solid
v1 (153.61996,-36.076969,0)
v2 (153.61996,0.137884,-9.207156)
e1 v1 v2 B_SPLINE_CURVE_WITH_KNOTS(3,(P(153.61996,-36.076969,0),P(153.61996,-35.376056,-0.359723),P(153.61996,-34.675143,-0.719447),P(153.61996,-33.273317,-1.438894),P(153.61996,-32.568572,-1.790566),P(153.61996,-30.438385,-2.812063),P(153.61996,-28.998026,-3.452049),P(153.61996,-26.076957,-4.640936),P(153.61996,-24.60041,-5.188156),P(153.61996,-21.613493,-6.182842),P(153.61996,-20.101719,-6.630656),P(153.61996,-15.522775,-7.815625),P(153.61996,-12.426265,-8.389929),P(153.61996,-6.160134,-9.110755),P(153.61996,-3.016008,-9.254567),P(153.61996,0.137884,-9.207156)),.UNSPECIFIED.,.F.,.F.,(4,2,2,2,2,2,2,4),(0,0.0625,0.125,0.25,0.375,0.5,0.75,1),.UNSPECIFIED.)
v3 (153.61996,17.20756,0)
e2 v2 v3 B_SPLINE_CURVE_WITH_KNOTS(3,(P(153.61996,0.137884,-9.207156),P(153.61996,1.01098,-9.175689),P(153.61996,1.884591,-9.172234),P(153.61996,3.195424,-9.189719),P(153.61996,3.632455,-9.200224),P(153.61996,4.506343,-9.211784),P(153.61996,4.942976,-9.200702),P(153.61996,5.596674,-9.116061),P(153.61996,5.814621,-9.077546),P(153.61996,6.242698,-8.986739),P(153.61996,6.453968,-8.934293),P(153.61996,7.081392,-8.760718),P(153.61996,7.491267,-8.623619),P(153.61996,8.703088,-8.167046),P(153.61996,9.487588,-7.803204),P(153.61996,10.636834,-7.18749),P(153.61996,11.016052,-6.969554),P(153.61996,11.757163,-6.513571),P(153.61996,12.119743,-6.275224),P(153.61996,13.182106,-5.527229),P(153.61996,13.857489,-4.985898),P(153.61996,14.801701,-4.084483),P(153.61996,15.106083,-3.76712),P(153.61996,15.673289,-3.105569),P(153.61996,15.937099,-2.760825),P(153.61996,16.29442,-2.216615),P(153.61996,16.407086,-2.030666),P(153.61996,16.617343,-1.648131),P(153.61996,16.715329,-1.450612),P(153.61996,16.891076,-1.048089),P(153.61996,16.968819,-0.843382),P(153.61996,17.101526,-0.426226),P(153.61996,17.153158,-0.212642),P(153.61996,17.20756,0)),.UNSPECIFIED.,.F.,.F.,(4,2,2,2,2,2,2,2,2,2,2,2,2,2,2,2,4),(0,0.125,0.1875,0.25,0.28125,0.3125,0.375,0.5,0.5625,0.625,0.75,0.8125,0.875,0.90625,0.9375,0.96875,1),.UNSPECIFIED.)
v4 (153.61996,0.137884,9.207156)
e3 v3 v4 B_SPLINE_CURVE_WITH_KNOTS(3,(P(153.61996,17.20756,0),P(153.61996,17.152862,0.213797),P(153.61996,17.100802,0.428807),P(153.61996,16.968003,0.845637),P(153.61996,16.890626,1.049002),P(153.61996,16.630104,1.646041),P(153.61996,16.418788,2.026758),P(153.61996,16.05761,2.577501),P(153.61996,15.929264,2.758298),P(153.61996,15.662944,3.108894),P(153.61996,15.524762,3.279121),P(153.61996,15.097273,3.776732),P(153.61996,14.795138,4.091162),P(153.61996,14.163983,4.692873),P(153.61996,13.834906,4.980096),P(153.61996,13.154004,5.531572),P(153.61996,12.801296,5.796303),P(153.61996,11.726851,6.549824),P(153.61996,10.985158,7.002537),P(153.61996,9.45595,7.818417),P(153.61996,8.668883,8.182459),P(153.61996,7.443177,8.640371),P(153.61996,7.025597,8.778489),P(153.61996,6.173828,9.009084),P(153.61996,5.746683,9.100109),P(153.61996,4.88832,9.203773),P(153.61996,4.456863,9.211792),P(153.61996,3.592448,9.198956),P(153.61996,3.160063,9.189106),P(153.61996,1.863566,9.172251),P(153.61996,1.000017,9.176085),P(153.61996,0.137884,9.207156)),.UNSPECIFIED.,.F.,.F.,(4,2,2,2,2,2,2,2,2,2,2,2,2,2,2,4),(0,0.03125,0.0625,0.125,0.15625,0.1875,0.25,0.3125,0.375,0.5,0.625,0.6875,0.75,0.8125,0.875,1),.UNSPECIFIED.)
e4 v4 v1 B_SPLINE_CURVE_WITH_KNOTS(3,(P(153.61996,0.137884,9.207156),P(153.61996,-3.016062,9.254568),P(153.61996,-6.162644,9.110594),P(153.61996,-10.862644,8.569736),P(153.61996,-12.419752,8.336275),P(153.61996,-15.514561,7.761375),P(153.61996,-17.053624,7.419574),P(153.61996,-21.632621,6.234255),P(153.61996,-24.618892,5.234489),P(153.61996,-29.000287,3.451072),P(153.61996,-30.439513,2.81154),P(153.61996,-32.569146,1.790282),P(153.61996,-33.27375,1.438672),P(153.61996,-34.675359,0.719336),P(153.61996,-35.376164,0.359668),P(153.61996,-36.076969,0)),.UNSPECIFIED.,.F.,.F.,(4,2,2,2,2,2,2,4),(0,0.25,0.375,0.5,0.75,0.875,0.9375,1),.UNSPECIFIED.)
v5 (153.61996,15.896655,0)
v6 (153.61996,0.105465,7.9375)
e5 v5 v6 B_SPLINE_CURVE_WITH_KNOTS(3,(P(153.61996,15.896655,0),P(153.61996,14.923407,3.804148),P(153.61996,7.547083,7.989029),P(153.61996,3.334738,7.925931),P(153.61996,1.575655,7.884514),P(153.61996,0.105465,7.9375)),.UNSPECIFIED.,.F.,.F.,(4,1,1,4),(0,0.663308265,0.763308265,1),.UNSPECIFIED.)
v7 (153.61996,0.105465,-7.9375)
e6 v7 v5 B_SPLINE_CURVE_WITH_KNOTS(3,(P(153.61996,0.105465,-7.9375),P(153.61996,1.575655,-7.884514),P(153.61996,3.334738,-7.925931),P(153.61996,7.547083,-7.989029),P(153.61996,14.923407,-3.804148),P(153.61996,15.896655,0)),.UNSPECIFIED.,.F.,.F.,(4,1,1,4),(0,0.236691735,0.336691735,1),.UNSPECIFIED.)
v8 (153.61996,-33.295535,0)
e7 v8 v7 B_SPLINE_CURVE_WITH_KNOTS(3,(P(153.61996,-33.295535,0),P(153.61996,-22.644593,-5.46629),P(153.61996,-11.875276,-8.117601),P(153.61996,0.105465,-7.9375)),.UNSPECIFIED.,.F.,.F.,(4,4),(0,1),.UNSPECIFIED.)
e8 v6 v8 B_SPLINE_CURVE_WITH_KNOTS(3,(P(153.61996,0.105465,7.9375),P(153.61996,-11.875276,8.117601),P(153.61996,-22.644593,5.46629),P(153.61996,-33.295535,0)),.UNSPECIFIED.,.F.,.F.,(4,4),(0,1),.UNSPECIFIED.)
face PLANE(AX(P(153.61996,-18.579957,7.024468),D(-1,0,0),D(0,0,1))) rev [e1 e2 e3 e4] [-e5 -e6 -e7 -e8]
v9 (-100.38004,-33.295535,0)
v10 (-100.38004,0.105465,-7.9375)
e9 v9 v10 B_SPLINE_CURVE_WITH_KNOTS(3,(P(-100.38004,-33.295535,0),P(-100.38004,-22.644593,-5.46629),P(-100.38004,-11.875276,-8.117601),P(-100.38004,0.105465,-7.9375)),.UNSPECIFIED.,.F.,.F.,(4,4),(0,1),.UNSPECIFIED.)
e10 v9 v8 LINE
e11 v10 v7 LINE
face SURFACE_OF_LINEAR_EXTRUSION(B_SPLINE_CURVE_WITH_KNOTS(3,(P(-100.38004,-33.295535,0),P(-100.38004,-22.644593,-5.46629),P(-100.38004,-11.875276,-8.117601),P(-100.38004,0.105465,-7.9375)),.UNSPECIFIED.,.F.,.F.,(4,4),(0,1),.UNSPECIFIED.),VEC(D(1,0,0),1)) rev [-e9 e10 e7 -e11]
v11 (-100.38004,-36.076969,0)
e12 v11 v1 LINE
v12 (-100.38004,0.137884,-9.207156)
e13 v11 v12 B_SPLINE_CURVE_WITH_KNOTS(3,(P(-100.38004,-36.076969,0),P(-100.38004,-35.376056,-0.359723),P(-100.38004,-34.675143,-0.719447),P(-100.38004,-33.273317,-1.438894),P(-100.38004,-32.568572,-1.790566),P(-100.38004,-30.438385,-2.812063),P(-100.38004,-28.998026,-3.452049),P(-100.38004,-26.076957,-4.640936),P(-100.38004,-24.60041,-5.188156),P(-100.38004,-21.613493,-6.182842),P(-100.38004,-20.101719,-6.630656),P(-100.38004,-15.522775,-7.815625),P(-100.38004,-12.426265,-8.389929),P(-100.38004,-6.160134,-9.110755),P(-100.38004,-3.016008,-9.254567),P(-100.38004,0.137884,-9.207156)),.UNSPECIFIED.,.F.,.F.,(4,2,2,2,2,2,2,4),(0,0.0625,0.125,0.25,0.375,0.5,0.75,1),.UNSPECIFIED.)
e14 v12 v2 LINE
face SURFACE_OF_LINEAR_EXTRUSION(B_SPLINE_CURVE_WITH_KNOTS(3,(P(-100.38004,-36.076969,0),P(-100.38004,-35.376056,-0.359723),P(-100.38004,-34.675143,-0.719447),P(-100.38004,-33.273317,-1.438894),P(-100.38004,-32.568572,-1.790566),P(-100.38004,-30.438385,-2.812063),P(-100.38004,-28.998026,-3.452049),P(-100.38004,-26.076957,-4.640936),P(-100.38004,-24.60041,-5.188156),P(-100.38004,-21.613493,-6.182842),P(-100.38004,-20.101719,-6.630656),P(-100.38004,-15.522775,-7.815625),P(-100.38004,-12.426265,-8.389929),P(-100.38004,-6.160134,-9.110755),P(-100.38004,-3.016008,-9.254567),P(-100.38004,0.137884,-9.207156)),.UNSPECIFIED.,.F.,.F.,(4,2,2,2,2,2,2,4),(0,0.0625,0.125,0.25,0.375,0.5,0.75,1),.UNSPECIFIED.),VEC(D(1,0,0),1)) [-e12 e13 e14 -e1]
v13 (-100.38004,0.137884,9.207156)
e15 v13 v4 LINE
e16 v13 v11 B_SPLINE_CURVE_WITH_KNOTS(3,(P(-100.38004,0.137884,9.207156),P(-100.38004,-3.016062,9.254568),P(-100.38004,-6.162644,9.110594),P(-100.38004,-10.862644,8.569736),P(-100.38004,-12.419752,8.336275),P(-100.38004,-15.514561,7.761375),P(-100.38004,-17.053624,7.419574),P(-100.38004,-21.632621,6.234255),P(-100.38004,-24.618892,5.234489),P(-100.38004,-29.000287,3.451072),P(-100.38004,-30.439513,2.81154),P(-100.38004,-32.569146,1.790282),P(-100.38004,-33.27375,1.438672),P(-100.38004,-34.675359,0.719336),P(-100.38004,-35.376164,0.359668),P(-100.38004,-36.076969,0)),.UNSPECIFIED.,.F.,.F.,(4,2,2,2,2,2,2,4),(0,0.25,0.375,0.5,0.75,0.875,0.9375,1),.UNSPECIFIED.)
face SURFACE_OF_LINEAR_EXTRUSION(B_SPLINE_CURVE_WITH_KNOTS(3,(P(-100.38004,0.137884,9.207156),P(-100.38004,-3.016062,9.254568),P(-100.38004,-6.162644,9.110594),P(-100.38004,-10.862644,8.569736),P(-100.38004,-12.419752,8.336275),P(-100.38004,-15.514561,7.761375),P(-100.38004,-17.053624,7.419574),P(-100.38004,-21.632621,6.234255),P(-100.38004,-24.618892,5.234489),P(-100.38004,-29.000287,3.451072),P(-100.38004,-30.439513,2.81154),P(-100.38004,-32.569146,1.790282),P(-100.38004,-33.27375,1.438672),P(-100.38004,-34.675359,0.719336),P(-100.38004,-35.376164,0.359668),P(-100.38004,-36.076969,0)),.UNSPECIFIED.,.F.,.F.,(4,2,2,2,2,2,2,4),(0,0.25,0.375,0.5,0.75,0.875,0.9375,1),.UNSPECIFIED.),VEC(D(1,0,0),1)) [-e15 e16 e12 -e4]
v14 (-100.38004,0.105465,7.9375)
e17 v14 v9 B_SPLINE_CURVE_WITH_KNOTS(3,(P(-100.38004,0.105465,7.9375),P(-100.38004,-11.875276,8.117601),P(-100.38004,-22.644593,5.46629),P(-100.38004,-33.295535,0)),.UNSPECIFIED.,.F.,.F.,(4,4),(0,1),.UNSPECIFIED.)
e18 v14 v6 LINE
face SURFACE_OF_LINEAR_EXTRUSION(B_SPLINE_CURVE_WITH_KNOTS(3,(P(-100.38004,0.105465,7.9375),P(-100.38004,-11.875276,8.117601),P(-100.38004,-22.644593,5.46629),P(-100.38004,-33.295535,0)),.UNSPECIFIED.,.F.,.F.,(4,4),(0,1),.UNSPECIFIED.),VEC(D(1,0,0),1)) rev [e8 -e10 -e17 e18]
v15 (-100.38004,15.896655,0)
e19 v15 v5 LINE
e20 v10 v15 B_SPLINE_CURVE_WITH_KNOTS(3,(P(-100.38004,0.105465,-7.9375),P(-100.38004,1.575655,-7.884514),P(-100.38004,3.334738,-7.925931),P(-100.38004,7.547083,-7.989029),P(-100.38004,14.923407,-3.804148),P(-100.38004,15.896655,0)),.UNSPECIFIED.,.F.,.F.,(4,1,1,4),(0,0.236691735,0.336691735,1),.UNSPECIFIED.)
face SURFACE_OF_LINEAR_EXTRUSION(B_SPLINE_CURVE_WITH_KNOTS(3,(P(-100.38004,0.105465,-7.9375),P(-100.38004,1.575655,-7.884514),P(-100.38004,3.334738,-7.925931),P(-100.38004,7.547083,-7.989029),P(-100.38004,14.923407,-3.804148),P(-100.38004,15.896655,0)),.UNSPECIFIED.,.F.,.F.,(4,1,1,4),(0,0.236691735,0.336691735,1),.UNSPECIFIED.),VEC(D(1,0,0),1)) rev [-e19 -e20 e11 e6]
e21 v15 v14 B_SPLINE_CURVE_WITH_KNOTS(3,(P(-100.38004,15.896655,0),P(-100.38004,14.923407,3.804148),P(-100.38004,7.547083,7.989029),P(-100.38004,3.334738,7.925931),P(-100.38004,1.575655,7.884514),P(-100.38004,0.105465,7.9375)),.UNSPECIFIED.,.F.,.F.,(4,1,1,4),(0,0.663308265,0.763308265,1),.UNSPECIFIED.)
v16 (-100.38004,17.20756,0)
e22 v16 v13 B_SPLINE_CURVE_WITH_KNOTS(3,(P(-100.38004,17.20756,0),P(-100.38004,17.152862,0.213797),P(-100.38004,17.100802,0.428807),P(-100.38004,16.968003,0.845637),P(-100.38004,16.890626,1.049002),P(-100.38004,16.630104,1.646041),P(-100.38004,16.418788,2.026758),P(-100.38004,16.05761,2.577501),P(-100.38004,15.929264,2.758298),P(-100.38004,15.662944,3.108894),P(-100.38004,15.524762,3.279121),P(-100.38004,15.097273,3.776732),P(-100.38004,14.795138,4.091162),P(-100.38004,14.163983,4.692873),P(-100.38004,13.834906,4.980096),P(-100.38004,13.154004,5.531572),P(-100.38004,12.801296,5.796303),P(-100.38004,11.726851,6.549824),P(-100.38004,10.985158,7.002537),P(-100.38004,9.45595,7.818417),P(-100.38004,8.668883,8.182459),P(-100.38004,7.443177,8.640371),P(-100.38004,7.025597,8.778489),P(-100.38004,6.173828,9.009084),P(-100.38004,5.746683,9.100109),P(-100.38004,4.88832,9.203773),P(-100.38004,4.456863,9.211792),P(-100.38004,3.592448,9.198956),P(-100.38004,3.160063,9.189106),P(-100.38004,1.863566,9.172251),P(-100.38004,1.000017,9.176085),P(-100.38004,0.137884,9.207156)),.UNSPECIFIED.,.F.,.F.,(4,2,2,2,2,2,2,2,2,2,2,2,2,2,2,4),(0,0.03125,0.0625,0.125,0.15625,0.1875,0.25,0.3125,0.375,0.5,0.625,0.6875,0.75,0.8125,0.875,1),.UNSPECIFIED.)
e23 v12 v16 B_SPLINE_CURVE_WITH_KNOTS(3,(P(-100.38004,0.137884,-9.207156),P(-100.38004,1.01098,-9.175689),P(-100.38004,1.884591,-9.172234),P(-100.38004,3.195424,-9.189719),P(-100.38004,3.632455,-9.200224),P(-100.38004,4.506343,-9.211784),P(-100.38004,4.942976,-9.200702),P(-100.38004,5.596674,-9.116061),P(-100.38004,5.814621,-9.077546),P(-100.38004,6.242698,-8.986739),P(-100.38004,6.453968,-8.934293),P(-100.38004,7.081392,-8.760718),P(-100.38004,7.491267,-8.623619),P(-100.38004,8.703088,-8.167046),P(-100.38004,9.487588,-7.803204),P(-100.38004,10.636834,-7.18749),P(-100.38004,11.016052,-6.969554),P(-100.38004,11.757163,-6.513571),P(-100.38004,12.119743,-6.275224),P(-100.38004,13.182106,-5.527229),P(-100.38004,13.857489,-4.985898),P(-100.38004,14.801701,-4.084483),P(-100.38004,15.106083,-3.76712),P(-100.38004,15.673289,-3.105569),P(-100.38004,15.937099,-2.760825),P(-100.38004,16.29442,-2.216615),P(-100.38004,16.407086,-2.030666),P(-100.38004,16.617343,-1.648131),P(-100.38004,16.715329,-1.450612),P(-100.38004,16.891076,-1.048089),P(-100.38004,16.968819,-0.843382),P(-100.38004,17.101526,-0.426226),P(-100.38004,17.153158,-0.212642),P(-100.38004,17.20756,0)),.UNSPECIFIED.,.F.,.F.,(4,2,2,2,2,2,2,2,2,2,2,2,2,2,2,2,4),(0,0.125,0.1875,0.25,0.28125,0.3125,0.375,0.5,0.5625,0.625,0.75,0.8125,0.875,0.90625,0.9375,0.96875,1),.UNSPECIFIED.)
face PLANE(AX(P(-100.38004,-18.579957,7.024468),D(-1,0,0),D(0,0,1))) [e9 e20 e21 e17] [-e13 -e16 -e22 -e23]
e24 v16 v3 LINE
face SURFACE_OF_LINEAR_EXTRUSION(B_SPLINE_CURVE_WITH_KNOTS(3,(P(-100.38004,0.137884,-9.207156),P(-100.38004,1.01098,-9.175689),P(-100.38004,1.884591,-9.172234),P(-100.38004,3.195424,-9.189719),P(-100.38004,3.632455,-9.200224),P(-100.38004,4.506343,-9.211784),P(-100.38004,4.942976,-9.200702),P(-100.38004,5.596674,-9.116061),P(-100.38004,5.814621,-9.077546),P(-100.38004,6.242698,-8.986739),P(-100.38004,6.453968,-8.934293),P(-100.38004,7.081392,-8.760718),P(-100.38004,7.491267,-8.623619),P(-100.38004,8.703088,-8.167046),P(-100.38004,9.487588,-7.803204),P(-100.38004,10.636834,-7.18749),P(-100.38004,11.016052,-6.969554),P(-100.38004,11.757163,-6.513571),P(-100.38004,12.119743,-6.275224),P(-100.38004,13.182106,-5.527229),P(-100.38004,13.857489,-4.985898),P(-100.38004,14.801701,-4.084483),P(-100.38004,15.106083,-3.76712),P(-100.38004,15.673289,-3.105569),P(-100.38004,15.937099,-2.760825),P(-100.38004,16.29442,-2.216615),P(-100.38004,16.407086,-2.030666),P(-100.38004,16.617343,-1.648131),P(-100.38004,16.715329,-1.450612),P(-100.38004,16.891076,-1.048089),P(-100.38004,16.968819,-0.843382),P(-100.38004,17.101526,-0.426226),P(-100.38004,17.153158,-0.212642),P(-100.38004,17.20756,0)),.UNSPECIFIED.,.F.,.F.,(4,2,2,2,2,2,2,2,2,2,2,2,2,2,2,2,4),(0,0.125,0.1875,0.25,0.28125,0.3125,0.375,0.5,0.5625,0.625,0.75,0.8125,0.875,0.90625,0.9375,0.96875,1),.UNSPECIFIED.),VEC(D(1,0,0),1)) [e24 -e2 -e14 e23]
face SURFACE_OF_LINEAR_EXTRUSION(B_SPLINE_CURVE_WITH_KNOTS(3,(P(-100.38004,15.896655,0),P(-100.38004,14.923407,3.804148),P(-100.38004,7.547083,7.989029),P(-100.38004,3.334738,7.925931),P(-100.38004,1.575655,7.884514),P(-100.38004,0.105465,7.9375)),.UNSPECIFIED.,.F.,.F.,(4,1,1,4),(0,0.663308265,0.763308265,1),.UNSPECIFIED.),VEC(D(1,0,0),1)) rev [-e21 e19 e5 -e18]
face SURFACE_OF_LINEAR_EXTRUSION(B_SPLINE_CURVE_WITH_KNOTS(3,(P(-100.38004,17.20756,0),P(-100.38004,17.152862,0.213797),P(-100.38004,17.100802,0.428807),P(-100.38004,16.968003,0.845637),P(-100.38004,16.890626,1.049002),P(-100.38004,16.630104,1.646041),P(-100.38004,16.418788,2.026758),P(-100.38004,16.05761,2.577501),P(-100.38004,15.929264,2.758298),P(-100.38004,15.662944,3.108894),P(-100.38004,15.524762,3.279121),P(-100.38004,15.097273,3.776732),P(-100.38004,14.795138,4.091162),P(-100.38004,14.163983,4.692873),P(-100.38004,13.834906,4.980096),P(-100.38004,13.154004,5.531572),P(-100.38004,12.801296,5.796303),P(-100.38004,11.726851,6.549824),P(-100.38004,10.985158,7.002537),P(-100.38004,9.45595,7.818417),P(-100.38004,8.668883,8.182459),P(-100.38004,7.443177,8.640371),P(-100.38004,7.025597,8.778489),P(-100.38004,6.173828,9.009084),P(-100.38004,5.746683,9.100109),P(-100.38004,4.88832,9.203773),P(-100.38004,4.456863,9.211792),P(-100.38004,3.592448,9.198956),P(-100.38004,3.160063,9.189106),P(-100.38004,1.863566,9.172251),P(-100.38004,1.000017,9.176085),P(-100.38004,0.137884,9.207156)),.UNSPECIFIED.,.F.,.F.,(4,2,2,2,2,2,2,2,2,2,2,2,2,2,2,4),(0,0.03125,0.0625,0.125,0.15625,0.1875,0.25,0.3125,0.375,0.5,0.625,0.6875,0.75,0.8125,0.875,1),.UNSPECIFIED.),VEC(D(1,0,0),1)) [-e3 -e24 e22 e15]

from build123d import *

# Parameters (mm, degrees)
BOSS_EXTRUDE1_DEPTH      = 153.61996
BOSS_EXTRUDE1_DEPTH_BACK = 104.21574
SKETCH1_R                = 7.9375
SKETCH1_R_2              = 6.4643
EXTRUDE_THIN1_START      = -254
EXTRUDE_THIN1_DEPTH      = 254


# Read off the part's stored shape, not the designer's step: Extrude-Thin1
with BuildPart() as part:
    # Sketch1 → Boss-Extrude1 (new, two sides: drawn at the far end of the back side and taken through both)
    with BuildSketch(Plane(origin=(0, 0, 0), x_dir=(0, 0, -1), z_dir=(1, 0, 0)).offset(-BOSS_EXTRUDE1_DEPTH_BACK)):
        with Locations(Location((0, 0, 0), (0, 0, 270))):
            Circle(SKETCH1_R)
        with Locations(Location((0, 0, 0), (0, 0, 270))):
            Circle(SKETCH1_R_2, mode=Mode.SUBTRACT)
    extrude(amount=BOSS_EXTRUDE1_DEPTH + BOSS_EXTRUDE1_DEPTH_BACK)


with BuildPart() as body_2:
    # Extrude-Thin1 outline → Extrude-Thin1 (new body)
    with BuildSketch(Plane(origin=(153.619959862, 0, 0), x_dir=(0, 0, -1), z_dir=(1, 0, 0)).offset(EXTRUDE_THIN1_START)):
        with BuildLine():
            add(Edge.make_bspline(
                [(0, 17.207559546), (-0.213797016, 17.152862004), (-0.42880706, 17.100801803), (-0.845636753, 16.968003101), (-1.049002351, 16.890625775), (-1.646041309, 16.630103699), (-2.026757553, 16.418787844), (-2.577500677, 16.057610271), (-2.758298236, 15.929264249), (-3.108894312, 15.662943804), (-3.279121061, 15.524761589), (-3.776732023, 15.097272706), (-4.091162254, 14.795137978), (-4.692872976, 14.163982702), (-4.980096404, 13.834905644), (-5.531572182, 13.154003751), (-5.79630298, 12.801295822), (-6.549823619, 11.726851467), (-7.002537116, 10.985157901), (-7.81841744, 9.455950062), (-8.182458905, 8.668883339), (-8.640371405, 7.443177376), (-8.778488758, 7.025596822), (-9.009083778, 6.173827929), (-9.100109427, 5.746682632), (-9.20377314, 4.888320037), (-9.211792234, 4.456862798), (-9.198956322, 3.592448397), (-9.189105956, 3.160062893), (-9.172251023, 1.863565908), (-9.176084553, 1.000017435), (-9.207156149, 0.137883897)],
                knots=[0, 0, 0, 0, 0.03125, 0.03125, 0.0625, 0.0625, 0.125, 0.125, 0.15625, 0.15625, 0.1875, 0.1875, 0.25, 0.25, 0.3125, 0.3125, 0.375, 0.375, 0.5, 0.5, 0.625, 0.625, 0.6875, 0.6875, 0.75, 0.75, 0.8125, 0.8125, 0.875, 0.875, 1, 1, 1, 1], degree=3))
            add(Edge.make_bspline(
                [(-9.207156149, 0.137883897), (-9.254567879, -3.016061968), (-9.110594057, -6.162643619), (-8.569736414, -10.862643519), (-8.336275013, -12.419752076), (-7.761375356, -15.514560805), (-7.419573925, -17.053624435), (-6.234254823, -21.632621497), (-5.234488958, -24.618892113), (-3.451071682, -29.000286622), (-2.811540258, -30.439512737), (-1.79028171, -32.569146175), (-1.438672145, -33.273749518), (-0.719336072, -34.675359425), (-0.359668036, -35.376164378), (0, -36.076969332)],
                knots=[0, 0, 0, 0, 0.25, 0.25, 0.375, 0.375, 0.5, 0.5, 0.75, 0.75, 0.875, 0.875, 0.9375, 0.9375, 1, 1, 1, 1], degree=3))
            add(Edge.make_bspline(
                [(0, -36.076969332), (0.359723472, -35.376056363), (0.719446944, -34.675143394), (1.438893888, -33.273317456), (1.790565857, -32.568572444), (2.812063227, -30.438384557), (3.452048995, -28.998025839), (4.640936279, -26.076956924), (5.18815569, -24.600410118), (6.182841679, -21.613493253), (6.630656344, -20.101718647), (7.815624895, -15.522775449), (8.389928975, -12.426265441), (9.11075463, -6.160134365), (9.254567065, -3.016007792), (9.207156149, 0.137883897)],
                knots=[0, 0, 0, 0, 0.0625, 0.0625, 0.125, 0.125, 0.25, 0.25, 0.375, 0.375, 0.5, 0.5, 0.75, 0.75, 1, 1, 1, 1], degree=3))
            add(Edge.make_bspline(
                [(9.207156149, 0.137883897), (9.175689476, 1.0109795), (9.172233827, 1.884590619), (9.189718729, 3.195424485), (9.200223759, 3.632455178), (9.211783508, 4.50634264), (9.200702397, 4.942976061), (9.116060671, 5.596674351), (9.077545633, 5.814621094), (8.98673913, 6.242698466), (8.934293247, 6.453967929), (8.760718275, 7.081391667), (8.623619453, 7.491266508), (8.167045839, 8.703087673), (7.803203601, 9.487588343), (7.187490205, 10.636834402), (6.969553739, 11.016052248), (6.513571235, 11.757163338), (6.275223658, 12.119743306), (5.527228859, 13.18210628), (4.98589787, 13.857489095), (4.084483233, 14.801700924), (3.767120438, 15.10608301), (3.105568901, 15.673289405), (2.760825125, 15.937099293), (2.216615083, 16.294420145), (2.030666021, 16.407085609), (1.648130786, 16.617343262), (1.450611941, 16.715328905), (1.048088593, 16.891075907), (0.843382437, 16.968818509), (0.426225712, 17.101525866), (0.212641899, 17.153157527), (0, 17.207559546)],
                knots=[0, 0, 0, 0, 0.125, 0.125, 0.1875, 0.1875, 0.25, 0.25, 0.28125, 0.28125, 0.3125, 0.3125, 0.375, 0.375, 0.5, 0.5, 0.5625, 0.5625, 0.625, 0.625, 0.75, 0.75, 0.8125, 0.8125, 0.875, 0.875, 0.90625, 0.90625, 0.9375, 0.9375, 0.96875, 0.96875, 1, 1, 1, 1], degree=3))
        make_face()
        with BuildLine():
            add(Edge.make_bspline(
                [(-7.9375, 0.105464983), (-8.117600633, -11.875275839), (-5.466290217, -22.644593383), (0, -33.295535017)],
                knots=[0, 0, 0, 0, 1, 1, 1, 1], degree=3))
            add(Edge.make_bspline(
                [(0, 15.896655346), (-3.804147623, 14.923407312), (-7.989029069, 7.547083002), (-7.925930538, 3.33473819), (-7.884513847, 1.575654615), (-7.9375, 0.105464983)],
                knots=[0, 0, 0, 0, 0.663308265, 0.763308265, 1, 1, 1, 1], degree=3))
            add(Edge.make_bspline(
                [(7.9375, 0.105464983), (7.884513847, 1.575654615), (7.925930538, 3.33473819), (7.989029069, 7.547083002), (3.804147623, 14.923407312), (0, 15.896655346)],
                knots=[0, 0, 0, 0, 0.236691735, 0.336691735, 1, 1, 1, 1], degree=3))
            add(Edge.make_bspline(
                [(0, -33.295535017), (5.466290217, -22.644593383), (8.117600633, -11.875275839), (7.9375, 0.105464983)],
                knots=[0, 0, 0, 0, 1, 1, 1, 1], degree=3))
        make_face(mode=Mode.SUBTRACT)
    extrude(amount=EXTRUDE_THIN1_DEPTH)


solid = body_2.part
